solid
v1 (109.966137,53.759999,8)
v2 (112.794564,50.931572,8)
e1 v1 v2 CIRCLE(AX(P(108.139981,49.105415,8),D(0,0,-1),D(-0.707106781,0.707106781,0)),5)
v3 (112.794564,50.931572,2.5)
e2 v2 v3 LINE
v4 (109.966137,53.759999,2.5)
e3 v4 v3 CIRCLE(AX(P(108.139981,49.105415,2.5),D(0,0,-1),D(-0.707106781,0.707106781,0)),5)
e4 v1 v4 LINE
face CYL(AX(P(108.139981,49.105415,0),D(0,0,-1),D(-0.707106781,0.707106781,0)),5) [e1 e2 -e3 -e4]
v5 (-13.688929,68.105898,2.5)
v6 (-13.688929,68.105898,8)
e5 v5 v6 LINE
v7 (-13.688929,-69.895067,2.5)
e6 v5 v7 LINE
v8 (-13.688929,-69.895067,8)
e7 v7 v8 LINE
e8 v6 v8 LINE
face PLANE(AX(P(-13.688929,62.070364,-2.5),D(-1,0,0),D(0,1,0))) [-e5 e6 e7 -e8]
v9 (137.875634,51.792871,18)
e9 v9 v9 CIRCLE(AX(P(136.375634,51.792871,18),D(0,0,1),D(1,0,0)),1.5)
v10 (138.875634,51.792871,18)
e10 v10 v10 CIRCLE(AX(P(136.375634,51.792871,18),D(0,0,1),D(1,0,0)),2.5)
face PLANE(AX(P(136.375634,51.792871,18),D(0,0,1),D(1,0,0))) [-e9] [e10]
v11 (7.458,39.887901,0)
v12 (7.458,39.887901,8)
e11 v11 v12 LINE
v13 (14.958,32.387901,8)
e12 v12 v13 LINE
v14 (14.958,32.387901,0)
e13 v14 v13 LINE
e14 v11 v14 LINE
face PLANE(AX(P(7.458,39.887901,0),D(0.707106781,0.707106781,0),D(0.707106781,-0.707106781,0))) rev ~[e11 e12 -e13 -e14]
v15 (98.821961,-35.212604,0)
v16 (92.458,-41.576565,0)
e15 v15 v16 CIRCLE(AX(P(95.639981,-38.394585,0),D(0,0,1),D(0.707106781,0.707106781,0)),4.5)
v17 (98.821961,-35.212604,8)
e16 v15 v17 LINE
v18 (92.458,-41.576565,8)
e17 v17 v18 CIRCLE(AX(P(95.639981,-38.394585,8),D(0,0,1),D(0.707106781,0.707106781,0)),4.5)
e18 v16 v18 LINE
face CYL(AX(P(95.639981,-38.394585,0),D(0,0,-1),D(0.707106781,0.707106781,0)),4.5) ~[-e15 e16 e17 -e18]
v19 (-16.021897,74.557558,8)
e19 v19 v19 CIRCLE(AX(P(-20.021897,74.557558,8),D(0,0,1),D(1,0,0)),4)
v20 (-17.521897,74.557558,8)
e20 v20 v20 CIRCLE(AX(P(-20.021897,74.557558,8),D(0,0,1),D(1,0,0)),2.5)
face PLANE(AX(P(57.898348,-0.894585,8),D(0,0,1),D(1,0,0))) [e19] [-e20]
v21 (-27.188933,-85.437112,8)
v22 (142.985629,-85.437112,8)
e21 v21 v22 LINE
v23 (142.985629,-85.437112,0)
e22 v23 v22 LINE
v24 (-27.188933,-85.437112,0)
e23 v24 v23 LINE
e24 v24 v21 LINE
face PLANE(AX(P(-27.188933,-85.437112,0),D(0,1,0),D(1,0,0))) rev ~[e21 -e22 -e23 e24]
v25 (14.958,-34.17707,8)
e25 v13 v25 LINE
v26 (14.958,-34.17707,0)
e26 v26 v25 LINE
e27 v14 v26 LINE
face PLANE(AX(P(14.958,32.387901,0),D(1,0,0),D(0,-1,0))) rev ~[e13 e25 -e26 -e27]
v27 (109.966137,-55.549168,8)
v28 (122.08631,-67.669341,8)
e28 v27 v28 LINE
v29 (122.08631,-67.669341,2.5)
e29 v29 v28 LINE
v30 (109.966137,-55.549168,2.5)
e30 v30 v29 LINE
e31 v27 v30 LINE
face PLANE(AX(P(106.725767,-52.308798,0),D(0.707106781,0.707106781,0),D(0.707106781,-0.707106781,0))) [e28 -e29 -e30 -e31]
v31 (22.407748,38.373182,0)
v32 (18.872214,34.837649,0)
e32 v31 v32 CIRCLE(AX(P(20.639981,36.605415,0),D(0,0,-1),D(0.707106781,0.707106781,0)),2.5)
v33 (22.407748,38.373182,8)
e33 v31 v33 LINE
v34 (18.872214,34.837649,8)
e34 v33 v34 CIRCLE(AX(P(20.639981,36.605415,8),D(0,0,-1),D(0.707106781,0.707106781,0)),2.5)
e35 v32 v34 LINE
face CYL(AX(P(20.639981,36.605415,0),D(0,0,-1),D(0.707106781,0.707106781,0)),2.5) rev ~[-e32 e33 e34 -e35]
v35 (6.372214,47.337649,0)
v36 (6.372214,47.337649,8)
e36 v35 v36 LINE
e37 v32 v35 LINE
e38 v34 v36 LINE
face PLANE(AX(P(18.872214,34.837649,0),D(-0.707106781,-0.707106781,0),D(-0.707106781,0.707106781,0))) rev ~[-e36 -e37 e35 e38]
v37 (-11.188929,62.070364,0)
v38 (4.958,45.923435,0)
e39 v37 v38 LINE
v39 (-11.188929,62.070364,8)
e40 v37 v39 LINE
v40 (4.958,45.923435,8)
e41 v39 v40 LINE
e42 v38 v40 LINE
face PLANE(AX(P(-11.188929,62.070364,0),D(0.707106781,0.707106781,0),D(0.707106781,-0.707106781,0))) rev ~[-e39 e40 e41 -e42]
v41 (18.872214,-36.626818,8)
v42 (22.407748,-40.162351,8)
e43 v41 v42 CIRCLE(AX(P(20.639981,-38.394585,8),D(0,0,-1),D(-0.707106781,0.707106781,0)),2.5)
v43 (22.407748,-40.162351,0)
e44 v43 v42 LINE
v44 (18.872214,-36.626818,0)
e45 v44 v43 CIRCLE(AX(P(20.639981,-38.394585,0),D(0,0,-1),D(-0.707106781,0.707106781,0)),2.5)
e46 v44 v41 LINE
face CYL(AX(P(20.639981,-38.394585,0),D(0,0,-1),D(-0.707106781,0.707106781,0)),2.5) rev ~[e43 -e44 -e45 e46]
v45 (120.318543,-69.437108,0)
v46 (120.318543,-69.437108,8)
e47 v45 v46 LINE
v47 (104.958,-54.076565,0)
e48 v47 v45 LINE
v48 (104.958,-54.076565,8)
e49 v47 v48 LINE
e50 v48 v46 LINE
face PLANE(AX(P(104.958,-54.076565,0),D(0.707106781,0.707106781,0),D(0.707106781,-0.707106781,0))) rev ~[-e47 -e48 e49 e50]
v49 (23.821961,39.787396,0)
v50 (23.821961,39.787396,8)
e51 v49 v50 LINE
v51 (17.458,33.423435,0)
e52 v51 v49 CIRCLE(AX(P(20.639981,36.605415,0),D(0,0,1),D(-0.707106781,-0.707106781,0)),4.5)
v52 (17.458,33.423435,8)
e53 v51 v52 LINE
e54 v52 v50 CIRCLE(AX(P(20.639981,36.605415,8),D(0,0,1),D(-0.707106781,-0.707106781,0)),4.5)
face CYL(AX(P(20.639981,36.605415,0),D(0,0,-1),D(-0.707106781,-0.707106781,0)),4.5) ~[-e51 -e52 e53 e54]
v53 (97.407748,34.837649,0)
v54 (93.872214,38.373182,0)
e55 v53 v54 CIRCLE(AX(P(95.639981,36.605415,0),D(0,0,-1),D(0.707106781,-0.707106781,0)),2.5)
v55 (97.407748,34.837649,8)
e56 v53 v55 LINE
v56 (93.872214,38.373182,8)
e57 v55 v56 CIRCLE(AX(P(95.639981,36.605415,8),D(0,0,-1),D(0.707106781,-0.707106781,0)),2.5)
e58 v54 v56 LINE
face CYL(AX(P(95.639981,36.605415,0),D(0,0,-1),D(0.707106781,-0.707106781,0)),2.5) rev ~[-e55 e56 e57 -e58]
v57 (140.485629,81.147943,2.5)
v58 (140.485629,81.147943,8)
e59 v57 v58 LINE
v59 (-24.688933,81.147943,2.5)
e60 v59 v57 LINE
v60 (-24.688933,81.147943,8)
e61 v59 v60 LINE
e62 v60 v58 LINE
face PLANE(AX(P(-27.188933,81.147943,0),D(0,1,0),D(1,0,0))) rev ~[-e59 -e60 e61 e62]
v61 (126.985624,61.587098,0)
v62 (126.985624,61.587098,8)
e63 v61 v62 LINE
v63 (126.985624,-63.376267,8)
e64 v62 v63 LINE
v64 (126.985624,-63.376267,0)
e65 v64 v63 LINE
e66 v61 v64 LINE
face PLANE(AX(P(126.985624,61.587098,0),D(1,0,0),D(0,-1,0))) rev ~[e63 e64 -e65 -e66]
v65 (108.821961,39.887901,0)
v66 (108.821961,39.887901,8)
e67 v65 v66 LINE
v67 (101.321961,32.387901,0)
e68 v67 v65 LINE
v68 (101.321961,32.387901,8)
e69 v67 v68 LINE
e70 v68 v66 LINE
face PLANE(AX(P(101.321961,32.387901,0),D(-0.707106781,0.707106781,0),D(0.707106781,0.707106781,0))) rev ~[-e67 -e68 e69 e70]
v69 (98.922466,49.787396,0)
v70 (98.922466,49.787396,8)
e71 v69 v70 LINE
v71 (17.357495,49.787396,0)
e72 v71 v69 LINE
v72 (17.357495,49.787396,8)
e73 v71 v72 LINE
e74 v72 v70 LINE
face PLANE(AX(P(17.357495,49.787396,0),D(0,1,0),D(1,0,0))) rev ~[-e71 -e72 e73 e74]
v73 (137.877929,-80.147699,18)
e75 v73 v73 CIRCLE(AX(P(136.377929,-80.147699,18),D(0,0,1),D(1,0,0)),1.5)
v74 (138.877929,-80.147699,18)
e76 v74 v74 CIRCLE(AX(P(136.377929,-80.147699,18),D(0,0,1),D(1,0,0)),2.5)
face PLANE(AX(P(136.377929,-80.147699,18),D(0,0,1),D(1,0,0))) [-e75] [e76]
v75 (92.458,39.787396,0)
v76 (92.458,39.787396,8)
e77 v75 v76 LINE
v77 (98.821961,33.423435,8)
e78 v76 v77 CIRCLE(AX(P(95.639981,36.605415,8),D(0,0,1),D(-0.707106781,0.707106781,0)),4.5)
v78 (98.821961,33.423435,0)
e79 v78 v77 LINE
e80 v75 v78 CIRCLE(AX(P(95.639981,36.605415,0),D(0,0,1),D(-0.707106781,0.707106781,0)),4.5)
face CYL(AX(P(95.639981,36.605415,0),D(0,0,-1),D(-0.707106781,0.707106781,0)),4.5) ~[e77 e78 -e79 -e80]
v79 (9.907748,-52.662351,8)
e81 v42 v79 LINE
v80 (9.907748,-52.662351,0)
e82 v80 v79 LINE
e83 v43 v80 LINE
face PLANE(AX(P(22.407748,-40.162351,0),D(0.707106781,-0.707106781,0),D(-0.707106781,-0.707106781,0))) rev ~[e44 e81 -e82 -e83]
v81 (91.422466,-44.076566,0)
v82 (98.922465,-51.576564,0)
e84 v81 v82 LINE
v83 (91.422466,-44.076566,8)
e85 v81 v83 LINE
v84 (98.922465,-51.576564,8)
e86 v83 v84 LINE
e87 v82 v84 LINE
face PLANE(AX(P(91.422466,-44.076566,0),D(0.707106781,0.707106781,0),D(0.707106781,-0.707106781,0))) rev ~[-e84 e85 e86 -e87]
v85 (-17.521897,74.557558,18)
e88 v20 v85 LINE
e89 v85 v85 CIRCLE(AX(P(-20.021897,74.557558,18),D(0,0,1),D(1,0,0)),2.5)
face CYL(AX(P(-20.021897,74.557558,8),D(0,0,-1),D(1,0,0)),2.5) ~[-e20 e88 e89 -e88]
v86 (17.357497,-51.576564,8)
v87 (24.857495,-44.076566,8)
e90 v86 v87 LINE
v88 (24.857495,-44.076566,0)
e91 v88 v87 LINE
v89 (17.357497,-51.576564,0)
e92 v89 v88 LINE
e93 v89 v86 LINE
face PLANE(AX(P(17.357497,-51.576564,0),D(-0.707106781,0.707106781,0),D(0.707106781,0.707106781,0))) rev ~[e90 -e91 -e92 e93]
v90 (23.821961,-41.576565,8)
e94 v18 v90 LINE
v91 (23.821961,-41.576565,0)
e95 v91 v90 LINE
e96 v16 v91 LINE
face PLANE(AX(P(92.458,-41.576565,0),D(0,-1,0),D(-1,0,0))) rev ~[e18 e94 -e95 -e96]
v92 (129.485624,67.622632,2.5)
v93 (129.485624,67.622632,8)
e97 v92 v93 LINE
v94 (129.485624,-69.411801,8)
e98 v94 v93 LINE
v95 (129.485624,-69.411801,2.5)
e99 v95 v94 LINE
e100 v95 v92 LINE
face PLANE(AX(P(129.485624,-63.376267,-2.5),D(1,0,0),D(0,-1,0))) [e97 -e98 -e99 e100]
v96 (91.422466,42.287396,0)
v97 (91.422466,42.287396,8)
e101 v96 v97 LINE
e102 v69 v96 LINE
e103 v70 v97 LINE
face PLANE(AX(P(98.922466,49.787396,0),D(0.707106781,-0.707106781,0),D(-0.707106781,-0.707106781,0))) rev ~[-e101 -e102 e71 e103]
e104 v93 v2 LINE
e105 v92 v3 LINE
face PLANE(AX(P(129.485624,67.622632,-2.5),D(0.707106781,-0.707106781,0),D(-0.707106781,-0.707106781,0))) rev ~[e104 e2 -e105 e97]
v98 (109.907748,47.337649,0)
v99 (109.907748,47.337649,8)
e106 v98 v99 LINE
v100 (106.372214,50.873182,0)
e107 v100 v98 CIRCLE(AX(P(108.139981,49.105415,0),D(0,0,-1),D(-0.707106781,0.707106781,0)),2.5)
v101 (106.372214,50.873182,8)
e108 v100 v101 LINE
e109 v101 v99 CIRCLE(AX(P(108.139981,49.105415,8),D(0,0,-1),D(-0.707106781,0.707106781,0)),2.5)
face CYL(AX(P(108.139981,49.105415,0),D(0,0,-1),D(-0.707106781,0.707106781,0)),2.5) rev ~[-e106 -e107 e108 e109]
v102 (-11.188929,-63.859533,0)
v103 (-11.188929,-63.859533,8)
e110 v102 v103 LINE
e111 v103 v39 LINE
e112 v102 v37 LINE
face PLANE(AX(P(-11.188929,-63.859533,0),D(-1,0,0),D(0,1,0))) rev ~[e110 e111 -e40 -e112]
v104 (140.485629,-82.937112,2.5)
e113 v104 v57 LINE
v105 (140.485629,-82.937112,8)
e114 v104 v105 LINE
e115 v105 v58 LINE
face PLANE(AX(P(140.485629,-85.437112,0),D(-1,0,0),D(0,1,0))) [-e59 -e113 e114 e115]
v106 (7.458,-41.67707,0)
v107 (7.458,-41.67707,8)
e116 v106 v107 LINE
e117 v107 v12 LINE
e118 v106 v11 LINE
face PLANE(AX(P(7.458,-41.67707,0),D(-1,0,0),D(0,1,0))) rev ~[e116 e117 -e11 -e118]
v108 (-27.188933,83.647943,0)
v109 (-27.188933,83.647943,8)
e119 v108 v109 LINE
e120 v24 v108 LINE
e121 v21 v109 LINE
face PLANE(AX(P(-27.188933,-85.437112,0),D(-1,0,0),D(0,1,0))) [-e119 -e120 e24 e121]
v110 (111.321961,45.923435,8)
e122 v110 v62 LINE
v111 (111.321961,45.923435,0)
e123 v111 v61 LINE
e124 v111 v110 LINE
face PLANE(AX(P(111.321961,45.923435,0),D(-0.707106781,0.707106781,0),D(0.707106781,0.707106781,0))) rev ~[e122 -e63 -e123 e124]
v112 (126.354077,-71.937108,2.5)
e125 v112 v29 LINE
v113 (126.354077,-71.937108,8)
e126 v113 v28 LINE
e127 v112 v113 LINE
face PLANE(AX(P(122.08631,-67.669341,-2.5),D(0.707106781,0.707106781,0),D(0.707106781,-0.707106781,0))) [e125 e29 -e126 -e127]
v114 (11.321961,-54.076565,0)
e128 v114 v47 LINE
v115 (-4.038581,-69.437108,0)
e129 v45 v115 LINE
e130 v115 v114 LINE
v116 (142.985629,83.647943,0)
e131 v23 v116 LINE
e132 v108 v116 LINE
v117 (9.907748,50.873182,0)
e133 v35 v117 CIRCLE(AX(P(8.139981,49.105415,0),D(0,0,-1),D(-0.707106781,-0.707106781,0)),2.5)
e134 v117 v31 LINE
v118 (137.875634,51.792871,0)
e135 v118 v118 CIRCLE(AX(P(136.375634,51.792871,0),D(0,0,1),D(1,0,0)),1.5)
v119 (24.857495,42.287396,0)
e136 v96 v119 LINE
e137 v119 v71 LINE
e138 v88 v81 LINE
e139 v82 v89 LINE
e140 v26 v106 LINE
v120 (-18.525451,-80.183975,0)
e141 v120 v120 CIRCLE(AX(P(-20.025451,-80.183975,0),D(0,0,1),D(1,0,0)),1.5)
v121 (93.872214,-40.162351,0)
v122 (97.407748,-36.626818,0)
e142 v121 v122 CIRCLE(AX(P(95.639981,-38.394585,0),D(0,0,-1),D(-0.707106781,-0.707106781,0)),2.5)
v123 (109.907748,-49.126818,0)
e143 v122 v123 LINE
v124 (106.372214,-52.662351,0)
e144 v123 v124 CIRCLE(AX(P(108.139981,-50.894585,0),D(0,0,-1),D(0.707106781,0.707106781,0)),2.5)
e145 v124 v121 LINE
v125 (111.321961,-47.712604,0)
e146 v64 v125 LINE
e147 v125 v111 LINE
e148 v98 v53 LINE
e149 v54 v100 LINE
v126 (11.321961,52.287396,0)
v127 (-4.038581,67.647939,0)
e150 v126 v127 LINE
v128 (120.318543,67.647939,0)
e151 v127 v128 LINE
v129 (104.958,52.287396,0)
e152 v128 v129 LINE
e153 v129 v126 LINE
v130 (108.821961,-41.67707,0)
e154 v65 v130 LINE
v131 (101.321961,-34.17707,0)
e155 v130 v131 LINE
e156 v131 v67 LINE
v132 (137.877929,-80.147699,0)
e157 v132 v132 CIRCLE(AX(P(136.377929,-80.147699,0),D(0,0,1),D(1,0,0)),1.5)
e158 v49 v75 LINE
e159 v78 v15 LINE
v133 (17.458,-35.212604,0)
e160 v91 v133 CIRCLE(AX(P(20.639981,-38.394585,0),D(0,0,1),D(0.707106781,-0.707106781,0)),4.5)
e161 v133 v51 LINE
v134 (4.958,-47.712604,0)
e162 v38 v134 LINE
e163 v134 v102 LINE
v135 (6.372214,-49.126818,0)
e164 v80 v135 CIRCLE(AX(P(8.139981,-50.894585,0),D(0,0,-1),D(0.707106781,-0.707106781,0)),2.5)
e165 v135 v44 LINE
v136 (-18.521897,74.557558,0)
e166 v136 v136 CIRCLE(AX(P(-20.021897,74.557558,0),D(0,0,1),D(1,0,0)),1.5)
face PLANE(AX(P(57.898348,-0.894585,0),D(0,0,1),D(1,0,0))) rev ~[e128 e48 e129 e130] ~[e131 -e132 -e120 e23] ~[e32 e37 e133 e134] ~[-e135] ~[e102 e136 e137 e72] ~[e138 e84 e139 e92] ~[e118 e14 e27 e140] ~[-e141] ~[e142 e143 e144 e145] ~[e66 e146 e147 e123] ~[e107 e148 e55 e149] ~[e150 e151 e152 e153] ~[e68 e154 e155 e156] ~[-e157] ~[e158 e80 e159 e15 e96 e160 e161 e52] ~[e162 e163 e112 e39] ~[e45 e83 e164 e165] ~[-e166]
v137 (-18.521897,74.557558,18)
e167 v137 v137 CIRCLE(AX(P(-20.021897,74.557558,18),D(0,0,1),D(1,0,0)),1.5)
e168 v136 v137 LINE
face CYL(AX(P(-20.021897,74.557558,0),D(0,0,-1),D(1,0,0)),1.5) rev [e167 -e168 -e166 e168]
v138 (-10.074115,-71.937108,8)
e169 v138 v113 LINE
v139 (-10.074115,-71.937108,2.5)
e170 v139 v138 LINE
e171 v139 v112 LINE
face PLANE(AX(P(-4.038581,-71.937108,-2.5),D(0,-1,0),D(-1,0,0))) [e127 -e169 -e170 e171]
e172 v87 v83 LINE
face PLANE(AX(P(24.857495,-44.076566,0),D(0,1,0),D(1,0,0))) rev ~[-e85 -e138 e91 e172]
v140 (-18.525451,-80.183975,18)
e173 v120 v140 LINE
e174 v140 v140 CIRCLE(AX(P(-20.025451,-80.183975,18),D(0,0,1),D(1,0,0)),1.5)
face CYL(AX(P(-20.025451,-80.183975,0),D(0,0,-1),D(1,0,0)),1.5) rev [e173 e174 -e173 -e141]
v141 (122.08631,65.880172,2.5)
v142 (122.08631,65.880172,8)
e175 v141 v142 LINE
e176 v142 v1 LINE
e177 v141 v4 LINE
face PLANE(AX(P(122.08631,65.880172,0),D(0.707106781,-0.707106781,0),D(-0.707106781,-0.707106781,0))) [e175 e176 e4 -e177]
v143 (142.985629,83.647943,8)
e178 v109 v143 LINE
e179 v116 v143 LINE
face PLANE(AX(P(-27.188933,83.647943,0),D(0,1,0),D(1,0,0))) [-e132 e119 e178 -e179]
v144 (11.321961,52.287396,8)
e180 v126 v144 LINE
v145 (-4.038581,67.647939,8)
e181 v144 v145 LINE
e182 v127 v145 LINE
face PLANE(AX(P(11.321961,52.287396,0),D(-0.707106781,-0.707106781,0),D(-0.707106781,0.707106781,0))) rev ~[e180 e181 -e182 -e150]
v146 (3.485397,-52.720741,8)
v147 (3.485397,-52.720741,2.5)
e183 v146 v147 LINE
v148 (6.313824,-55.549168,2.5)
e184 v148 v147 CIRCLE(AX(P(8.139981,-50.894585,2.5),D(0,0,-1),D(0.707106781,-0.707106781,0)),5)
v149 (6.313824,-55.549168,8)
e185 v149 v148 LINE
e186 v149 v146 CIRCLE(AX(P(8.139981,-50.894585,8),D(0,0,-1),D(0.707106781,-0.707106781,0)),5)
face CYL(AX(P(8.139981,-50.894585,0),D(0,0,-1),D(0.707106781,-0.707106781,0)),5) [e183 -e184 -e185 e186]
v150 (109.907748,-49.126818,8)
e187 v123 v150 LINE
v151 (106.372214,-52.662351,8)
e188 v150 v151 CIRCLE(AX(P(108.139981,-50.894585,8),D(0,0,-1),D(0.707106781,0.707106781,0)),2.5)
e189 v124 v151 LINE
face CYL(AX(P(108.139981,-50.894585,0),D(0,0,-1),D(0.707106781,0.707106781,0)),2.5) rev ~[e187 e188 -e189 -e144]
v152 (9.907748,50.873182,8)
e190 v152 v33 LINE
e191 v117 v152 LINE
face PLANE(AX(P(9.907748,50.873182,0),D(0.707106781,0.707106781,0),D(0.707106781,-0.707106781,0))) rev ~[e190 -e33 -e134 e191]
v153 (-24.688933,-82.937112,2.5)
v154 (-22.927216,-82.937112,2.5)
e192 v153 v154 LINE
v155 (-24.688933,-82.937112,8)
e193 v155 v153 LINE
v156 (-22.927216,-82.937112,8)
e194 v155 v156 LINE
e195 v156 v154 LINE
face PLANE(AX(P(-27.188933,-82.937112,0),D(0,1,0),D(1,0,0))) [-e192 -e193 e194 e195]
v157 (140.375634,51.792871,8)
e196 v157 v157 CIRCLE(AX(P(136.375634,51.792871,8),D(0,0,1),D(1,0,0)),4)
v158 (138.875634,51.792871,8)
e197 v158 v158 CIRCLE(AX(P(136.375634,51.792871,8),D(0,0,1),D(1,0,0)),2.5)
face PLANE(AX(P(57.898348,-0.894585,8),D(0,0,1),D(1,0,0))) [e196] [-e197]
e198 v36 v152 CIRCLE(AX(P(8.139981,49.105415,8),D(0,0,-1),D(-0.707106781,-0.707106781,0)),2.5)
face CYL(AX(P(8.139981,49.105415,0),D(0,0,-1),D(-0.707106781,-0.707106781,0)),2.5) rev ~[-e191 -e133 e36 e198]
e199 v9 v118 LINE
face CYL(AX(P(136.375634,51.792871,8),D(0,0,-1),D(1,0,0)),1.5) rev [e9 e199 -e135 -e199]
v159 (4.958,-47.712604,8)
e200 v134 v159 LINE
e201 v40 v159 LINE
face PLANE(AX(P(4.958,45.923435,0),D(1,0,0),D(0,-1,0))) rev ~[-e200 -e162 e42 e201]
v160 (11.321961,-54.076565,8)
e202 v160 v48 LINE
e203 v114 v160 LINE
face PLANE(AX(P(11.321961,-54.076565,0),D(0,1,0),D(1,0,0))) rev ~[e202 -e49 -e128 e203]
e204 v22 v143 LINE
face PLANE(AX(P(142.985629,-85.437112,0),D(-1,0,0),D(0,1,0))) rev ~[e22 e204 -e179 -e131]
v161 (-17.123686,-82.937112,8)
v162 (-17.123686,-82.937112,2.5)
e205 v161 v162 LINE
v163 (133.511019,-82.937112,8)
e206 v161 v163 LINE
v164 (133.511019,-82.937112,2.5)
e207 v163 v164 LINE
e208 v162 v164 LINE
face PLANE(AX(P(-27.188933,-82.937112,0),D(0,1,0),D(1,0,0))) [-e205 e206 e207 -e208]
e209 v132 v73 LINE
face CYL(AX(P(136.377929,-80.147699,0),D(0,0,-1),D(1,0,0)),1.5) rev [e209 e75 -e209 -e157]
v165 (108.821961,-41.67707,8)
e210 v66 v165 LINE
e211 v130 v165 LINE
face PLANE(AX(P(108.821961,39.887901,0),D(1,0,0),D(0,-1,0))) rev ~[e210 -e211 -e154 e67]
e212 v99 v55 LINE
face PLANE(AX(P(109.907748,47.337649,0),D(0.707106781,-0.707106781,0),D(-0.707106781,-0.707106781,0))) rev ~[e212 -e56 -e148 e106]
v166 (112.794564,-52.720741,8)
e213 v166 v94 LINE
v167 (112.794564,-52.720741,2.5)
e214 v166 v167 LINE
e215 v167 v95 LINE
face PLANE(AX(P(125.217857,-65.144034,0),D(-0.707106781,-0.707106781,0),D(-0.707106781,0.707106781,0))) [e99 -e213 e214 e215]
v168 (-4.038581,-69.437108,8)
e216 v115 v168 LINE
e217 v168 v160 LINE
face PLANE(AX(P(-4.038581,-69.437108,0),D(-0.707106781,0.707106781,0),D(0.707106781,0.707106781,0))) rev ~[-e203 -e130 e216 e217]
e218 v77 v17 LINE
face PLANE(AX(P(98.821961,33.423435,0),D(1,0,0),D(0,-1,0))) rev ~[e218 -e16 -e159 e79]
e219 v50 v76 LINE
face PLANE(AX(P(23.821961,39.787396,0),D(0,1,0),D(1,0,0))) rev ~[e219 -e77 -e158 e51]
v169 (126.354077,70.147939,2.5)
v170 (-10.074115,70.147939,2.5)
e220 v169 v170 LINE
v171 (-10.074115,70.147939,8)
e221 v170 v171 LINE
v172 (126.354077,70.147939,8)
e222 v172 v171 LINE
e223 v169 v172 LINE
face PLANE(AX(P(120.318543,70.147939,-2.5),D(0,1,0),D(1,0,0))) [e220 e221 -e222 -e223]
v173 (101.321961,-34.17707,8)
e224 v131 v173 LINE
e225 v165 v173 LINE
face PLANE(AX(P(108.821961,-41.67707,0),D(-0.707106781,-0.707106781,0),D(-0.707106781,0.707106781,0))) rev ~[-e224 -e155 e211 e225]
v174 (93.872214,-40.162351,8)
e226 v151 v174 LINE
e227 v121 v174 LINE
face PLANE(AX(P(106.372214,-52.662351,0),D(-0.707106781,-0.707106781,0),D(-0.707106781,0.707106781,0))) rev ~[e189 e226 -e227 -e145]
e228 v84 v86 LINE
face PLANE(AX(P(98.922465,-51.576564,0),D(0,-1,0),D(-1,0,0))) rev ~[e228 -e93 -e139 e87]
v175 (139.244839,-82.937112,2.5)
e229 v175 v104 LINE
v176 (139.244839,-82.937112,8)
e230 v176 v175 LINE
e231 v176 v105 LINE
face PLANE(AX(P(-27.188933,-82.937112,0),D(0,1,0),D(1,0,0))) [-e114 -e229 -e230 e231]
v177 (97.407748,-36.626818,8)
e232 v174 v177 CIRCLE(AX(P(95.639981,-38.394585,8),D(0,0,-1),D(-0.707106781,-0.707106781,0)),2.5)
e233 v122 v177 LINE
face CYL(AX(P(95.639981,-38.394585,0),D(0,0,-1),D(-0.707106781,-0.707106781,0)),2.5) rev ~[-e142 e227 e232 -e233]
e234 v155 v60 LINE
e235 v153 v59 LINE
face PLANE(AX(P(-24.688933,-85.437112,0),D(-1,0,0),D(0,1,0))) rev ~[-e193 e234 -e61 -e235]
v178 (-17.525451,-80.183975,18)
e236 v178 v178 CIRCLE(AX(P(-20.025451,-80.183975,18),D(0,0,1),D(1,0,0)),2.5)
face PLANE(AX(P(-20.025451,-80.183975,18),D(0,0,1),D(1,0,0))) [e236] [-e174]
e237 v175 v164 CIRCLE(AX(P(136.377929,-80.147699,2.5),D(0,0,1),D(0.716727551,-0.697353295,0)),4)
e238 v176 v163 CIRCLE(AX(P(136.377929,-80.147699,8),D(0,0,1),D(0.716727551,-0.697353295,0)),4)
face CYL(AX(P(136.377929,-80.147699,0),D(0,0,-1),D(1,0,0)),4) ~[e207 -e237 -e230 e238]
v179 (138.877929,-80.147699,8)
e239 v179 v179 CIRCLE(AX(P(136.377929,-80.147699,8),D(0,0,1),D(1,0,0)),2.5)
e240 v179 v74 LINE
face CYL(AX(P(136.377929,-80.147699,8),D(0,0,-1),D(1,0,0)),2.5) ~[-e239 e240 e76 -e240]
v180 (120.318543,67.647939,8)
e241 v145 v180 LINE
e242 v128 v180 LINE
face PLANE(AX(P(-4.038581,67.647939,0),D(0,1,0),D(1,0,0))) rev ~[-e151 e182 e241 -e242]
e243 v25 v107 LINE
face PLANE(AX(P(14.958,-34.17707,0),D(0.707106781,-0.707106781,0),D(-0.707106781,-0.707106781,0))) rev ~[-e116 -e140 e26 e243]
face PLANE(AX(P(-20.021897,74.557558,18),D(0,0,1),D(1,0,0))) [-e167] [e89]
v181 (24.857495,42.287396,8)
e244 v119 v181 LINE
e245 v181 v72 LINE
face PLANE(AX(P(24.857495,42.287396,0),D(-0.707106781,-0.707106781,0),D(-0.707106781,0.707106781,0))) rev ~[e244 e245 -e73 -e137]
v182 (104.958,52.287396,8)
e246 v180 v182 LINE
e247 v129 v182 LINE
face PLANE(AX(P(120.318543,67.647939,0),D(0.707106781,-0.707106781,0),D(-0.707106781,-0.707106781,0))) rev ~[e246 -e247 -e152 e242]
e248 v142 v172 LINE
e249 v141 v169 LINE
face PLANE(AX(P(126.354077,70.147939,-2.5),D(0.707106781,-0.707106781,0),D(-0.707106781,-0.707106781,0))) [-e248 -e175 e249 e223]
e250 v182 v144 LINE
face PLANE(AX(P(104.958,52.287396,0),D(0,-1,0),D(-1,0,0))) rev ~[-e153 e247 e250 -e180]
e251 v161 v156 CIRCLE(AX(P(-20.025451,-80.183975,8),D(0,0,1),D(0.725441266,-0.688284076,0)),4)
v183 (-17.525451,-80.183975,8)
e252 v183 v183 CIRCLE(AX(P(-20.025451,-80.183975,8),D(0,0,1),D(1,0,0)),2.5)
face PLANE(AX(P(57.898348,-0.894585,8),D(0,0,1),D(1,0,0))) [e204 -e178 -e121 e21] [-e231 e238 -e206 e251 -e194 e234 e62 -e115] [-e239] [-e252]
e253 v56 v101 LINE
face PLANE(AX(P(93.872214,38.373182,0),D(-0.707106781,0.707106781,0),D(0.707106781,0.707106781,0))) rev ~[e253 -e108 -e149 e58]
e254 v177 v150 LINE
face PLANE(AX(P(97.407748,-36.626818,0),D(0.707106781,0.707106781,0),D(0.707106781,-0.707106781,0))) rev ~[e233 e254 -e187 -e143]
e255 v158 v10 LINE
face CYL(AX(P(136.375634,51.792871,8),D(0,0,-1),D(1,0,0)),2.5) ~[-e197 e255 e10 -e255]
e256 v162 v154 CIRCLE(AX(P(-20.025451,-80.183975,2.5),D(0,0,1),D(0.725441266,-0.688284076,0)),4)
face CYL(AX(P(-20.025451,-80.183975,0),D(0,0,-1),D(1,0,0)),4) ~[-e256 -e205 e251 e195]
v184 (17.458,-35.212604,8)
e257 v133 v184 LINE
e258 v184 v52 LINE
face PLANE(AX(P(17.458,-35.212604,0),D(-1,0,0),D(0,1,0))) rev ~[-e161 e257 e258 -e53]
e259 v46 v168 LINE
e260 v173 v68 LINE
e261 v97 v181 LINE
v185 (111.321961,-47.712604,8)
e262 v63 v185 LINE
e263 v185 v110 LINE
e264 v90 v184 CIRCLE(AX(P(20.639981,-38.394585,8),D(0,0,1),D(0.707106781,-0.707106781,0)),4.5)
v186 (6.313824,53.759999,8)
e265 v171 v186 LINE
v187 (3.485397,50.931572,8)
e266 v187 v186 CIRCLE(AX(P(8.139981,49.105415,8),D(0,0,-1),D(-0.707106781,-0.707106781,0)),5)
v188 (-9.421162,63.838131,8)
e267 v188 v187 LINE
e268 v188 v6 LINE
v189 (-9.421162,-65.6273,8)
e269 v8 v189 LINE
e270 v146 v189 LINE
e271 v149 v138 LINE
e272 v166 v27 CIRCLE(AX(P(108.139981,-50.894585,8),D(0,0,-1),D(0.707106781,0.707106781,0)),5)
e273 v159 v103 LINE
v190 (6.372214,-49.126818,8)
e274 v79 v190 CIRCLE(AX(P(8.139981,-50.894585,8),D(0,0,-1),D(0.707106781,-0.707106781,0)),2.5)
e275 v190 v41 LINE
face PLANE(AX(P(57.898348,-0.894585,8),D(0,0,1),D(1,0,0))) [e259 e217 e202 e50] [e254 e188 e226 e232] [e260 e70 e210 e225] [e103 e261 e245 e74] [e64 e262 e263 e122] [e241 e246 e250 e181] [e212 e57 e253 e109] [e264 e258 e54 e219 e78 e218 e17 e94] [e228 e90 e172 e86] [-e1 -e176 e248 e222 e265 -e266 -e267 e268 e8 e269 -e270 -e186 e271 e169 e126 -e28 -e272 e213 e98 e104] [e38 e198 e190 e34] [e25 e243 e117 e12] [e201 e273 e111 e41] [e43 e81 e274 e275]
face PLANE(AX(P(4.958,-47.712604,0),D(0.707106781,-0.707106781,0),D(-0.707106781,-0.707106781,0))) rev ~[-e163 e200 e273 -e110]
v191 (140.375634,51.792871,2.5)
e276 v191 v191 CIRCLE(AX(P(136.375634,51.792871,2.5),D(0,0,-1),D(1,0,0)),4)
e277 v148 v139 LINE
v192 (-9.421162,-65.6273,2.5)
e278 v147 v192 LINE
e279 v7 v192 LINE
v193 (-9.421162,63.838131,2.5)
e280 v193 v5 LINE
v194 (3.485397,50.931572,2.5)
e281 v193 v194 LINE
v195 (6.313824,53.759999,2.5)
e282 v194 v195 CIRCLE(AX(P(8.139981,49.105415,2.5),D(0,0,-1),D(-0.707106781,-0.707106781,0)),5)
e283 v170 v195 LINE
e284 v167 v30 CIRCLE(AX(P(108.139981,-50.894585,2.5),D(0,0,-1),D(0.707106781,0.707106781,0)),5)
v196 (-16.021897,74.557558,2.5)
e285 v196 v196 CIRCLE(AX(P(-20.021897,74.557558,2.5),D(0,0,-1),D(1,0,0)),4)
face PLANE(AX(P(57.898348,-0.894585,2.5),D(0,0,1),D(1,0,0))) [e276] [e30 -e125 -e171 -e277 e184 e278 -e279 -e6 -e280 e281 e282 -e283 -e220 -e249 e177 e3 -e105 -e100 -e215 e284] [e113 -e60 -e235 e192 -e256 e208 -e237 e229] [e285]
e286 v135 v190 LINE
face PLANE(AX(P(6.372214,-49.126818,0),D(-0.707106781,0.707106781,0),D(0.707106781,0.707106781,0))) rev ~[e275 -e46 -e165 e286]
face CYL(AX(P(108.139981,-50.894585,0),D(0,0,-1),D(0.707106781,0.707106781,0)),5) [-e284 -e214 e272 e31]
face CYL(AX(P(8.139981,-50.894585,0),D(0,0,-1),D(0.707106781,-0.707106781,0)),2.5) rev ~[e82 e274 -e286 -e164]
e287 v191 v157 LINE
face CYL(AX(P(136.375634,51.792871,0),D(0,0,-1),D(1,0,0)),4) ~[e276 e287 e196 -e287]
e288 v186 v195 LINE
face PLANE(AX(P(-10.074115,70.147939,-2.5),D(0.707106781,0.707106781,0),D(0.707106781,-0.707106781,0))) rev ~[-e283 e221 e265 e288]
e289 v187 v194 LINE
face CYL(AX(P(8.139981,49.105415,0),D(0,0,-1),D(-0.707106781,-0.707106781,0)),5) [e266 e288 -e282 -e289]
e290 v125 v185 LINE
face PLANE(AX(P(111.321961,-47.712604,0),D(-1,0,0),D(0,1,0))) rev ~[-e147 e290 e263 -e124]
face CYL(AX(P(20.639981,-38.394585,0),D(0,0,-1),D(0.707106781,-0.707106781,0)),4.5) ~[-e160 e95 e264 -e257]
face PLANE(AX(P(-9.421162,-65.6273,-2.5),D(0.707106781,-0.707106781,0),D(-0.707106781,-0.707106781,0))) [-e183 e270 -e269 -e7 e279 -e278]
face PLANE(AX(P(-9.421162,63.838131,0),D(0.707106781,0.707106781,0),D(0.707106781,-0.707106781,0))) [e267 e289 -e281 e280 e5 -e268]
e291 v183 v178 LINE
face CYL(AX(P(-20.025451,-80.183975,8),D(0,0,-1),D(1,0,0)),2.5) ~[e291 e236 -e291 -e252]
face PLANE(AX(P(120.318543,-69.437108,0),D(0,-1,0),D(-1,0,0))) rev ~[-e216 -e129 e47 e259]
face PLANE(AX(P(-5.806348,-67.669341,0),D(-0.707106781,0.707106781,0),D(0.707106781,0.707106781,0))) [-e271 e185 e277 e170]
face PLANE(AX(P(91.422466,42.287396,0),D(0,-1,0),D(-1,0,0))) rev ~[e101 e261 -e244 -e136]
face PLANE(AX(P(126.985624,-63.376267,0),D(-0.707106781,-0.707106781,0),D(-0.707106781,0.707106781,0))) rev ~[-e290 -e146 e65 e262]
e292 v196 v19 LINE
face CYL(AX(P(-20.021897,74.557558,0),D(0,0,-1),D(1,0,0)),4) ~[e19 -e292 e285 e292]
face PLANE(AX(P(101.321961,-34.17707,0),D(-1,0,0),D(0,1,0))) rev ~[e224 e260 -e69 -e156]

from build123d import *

# Parameters (mm, degrees)
F0_W        = 170.1745619284
F0_H        = 169.0850543895
F0_R        = 2.5
F0_R_2      = 1.5
F1_DEPTH    = 8
F2_T        = 2.5
F2_T3_DEPTH = 13
F3_R        = 2.5
F3_R_2      = 1.5
F4_DEPTH    = 10


# Not quite as in the source:
# - a shell that OpenCascade refuses in one call is made with other operations: the cavity is built on its own and cut out


with BuildPart() as f1:
    # F0 (on Top) → F1 (new body)
    with BuildSketch(Plane.XY):
        with Locations((57.8983475621, -0.8945845068)):
            Rectangle(F0_W, F0_H)
        with Locations((-20.0254507363, -80.1839753985)):
            Circle(F0_R, mode=Mode.SUBTRACT)
        with Locations((136.3779287785, -80.1476985216)):
            Circle(F0_R, mode=Mode.SUBTRACT)
        with Locations((-20.0218968093, 74.5575577021)):
            Circle(F0_R, mode=Mode.SUBTRACT)
        Polygon((-11.1889293083, 67.6479385942), (-4.0385814859, 67.6479385942), (120.3185426547, 67.6479385942), (126.9856244326, 67.6479385942), (126.9856244326, 61.5870983108), (126.9856244326, -63.3762673243), (126.9856244326, -69.4371076077), (120.3185426547, -69.4371076077), (-4.0385814859, -69.4371076077), (-11.1889293083, -69.4371076077), (-11.1889293083, -63.8595333687), (-11.1889293083, 62.0703643552), align=None, mode=Mode.SUBTRACT)
        with Locations((136.3756339997, 51.792871207)):
            Circle(F0_R, mode=Mode.SUBTRACT)
        with BuildLine():
            Line((23.8219610997, 39.7873960086), (11.3219610997, 52.2873960086))
            ThreePointArc((11.3219610997, 52.2873960086), (4.958000069, 52.2873960086), (4.958000069, 45.9234349779))
            Line((4.958000069, 45.9234349779), (17.458000069, 33.4234349779))
            ThreePointArc((17.458000069, 33.4234349779), (23.8219610997, 33.4234349779), (23.8219610997, 39.7873960086))
        make_face()
        with BuildLine():
            ThreePointArc((22.4077475373, 38.3731824462), (22.4077475373, 34.8376485403), (18.8722136314, 34.8376485403))
            Line((18.8722136314, 34.8376485403), (6.3722136314, 47.3376485403))
            ThreePointArc((6.3722136314, 47.3376485403), (6.3722136314, 50.8731824462), (9.9077475373, 50.8731824462))
            Line((9.9077475373, 50.8731824462), (22.4077475373, 38.3731824462))
        make_face(mode=Mode.SUBTRACT)
        with BuildLine():
            ThreePointArc((111.3219610997, 45.9234349779), (111.3219610997, 52.2873960086), (104.958000069, 52.2873960086))
            Line((104.958000069, 52.2873960086), (92.458000069, 39.7873960086))
            ThreePointArc((92.458000069, 39.7873960086), (92.458000069, 33.4234349779), (98.8219610997, 33.4234349779))
            Line((98.8219610997, 33.4234349779), (111.3219610997, 45.9234349779))
        make_face()
        with BuildLine():
            Line((109.9077475373, 47.3376485403), (97.4077475373, 34.8376485403))
            ThreePointArc((97.4077475373, 34.8376485403), (93.8722136314, 34.8376485403), (93.8722136314, 38.3731824462))
            Line((93.8722136314, 38.3731824462), (106.3722136314, 50.8731824462))
            ThreePointArc((106.3722136314, 50.8731824462), (109.9077475373, 50.8731824462), (109.9077475373, 47.3376485403))
        make_face(mode=Mode.SUBTRACT)
        with BuildLine():
            ThreePointArc((104.958000069, -54.0765650221), (111.3219610997, -54.0765650221), (111.3219610997, -47.7126039914))
            Line((111.3219610997, -47.7126039914), (98.8219610997, -35.2126039914))
            ThreePointArc((98.8219610997, -35.2126039914), (92.458000069, -35.2126039914), (92.458000069, -41.5765650221))
            Line((92.458000069, -41.5765650221), (104.958000069, -54.0765650221))
        make_face()
        with BuildLine():
            ThreePointArc((93.8722136314, -40.1623514597), (93.8722136314, -36.6268175538), (97.4077475373, -36.6268175538))
            Line((97.4077475373, -36.6268175538), (109.9077475373, -49.1268175538))
            ThreePointArc((109.9077475373, -49.1268175538), (109.9077475373, -52.6623514597), (106.3722136314, -52.6623514597))
            Line((106.3722136314, -52.6623514597), (93.8722136314, -40.1623514597))
        make_face(mode=Mode.SUBTRACT)
        with BuildLine():
            Line((17.458000069, -35.2126039914), (4.958000069, -47.7126039914))
            ThreePointArc((4.958000069, -47.7126039914), (4.958000069, -54.0765650221), (11.3219610997, -54.0765650221))
            Line((11.3219610997, -54.0765650221), (23.8219610997, -41.5765650221))
            ThreePointArc((23.8219610997, -41.5765650221), (23.8219610997, -35.2126039914), (17.458000069, -35.2126039914))
        make_face()
        with BuildLine():
            Line((6.3722136314, -49.1268175538), (18.8722136314, -36.6268175538))
            ThreePointArc((18.8722136314, -36.6268175538), (22.4077475373, -36.6268175538), (22.4077475373, -40.1623514597))
            Line((22.4077475373, -40.1623514597), (9.9077475373, -52.6623514597))
            ThreePointArc((9.9077475373, -52.6623514597), (6.3722136314, -52.6623514597), (6.3722136314, -49.1268175538))
        make_face(mode=Mode.SUBTRACT)
        with Locations((-20.0218968093, 74.5575577021)):
            Circle(F0_R)
        with Locations((-20.0218968093, 74.5575577021)):
            Circle(F0_R_2, mode=Mode.SUBTRACT)
        with Locations((136.3756339997, 51.792871207)):
            Circle(F0_R)
        with Locations((136.3756339997, 51.792871207)):
            Circle(F0_R_2, mode=Mode.SUBTRACT)
        with Locations((136.3779287785, -80.1476985216)):
            Circle(F0_R)
        with Locations((136.3779287785, -80.1476985216)):
            Circle(F0_R_2, mode=Mode.SUBTRACT)
        with Locations((-20.0254507363, -80.1839753985)):
            Circle(F0_R)
        with Locations((-20.0254507363, -80.1839753985)):
            Circle(F0_R_2, mode=Mode.SUBTRACT)
        with BuildLine():
            Line((126.9856244326, -63.3762673243), (111.3219610997, -47.7126039914))
            ThreePointArc((111.3219610997, -47.7126039914), (111.3219610997, -54.0765650221), (104.958000069, -54.0765650221))
            Line((104.958000069, -54.0765650221), (120.3185426547, -69.4371076077))
            Line((120.3185426547, -69.4371076077), (126.9856244326, -69.4371076077))
            Line((126.9856244326, -69.4371076077), (126.9856244326, -63.3762673243))
        make_face()
        with BuildLine():
            ThreePointArc((11.3219610997, -54.0765650221), (4.958000069, -54.0765650221), (4.958000069, -47.7126039914))
            Line((4.958000069, -47.7126039914), (-11.1889293083, -63.8595333687))
            Line((-11.1889293083, -63.8595333687), (-11.1889293083, -69.4371076077))
            Line((-11.1889293083, -69.4371076077), (-4.0385814859, -69.4371076077))
            Line((-4.0385814859, -69.4371076077), (11.3219610997, -54.0765650221))
        make_face()
        Polygon((23.8219610997, -41.5765650221), (11.3219610997, -54.0765650221), (104.958000069, -54.0765650221), (92.458000069, -41.5765650221), align=None)
        Polygon((24.857495267, -44.0765656531), (91.4224659017, -44.0765656531), (98.9224646398, -51.5765643911), (17.357496529, -51.5765643911), align=None, mode=Mode.SUBTRACT)
        Polygon((111.3219610997, -47.7126039914), (111.3219610997, 45.9234349779), (98.8219610997, 33.4234349779), (98.8219610997, -35.2126039914), align=None)
        Polygon((101.3219610997, -34.1770700855), (101.3219610997, 32.387901072), (108.8219610997, 39.887901072), (108.8219610997, -41.6770700855), align=None, mode=Mode.SUBTRACT)
        Polygon((17.458000069, 33.4234349779), (4.958000069, 45.9234349779), (4.958000069, -47.7126039914), (17.458000069, -35.2126039914), align=None)
        Polygon((14.958000069, 32.387901072), (14.958000069, -34.1770700855), (7.458000069, -41.6770700855), (7.458000069, 39.887901072), align=None, mode=Mode.SUBTRACT)
        Polygon((104.958000069, 52.2873960086), (11.3219610997, 52.2873960086), (23.8219610997, 39.7873960086), (92.458000069, 39.7873960086), align=None)
        Polygon((91.4224661631, 42.2873960086), (24.8574950057, 42.2873960086), (17.3574950057, 49.7873960086), (98.9224661631, 49.7873960086), align=None, mode=Mode.SUBTRACT)
        with BuildLine():
            Line((120.3185426547, 67.6479385942), (104.958000069, 52.2873960086))
            ThreePointArc((104.958000069, 52.2873960086), (111.3219610997, 52.2873960086), (111.3219610997, 45.9234349779))
            Line((111.3219610997, 45.9234349779), (126.9856244326, 61.5870983108))
            Line((126.9856244326, 61.5870983108), (126.9856244326, 67.6479385942))
            Line((126.9856244326, 67.6479385942), (120.3185426547, 67.6479385942))
        make_face()
        with BuildLine():
            ThreePointArc((4.958000069, 45.9234349779), (4.958000069, 52.2873960086), (11.3219610997, 52.2873960086))
            Line((11.3219610997, 52.2873960086), (-4.0385814859, 67.6479385942))
            Line((-4.0385814859, 67.6479385942), (-11.1889293083, 67.6479385942))
            Line((-11.1889293083, 67.6479385942), (-11.1889293083, 62.0703643552))
            Line((-11.1889293083, 62.0703643552), (4.958000069, 45.9234349779))
        make_face()
    extrude(amount=F1_DEPTH)

    # F2: shell of thickness 2.5, made by hand


with BuildPart() as f2_core1:
    # F2_t2: copy of F1
    add(f1.part)

    # the walls: a layer under each face that stays
    f2_faces = [f2_core1.faces().sort_by_distance(p)[0] for p in [
        (57.8983475621, 83.647942688, 4),
        (-27.1889334021, -0.8945845068, 4),
        (57.8983475621, -85.4371117015, 4),
        (142.9856285263, -0.8945845068, 4),
        (58.1399805844, 67.6479385942, 4),
        (112.6382713619, 59.9676673014, 4),
        (58.1399805844, 52.2873960086, 4),
        (3.6416898069, 59.9676673014, 4),
        (4.958000069, -0.8945845068, 4),
        (-3.1154646196, -55.7860686801, 4),
        (-11.1889293083, -0.8945845067, 4),
        (-3.1154646196, 53.9968996666, 4),
        (126.9856244326, -0.8945845068, 4),
        (119.1537927661, -55.5444356578, 4),
        (111.3219610997, -0.8945845068, 4),
        (119.1537927661, 53.7552666443, 4),
        (92.458000069, 33.4234349779, 4),
        (98.8219610997, -0.8945845068, 4),
        (92.458000069, -35.2126039914, 4),
        (58.1399805844, -41.5765650221, 4),
        (23.8219610997, -35.2126039914, 4),
        (17.458000069, -0.8945845068, 4),
        (23.8219610997, 33.4234349779, 4),
        (58.1399805844, 39.7873960086, 4),
        (112.6382713619, -61.7568363149, 4),
        (58.1399805844, -69.4371076077, 4),
        (3.6416898069, -61.7568363149, 4),
        (58.1399805844, -54.0765650221, 4),
        (-21.5218968093, 74.5575577021, 4),
        (134.8756339997, 51.792871207, 4),
        (134.8779287785, -80.1476985216, 4),
        (-21.5254507363, -80.1839753985, 4),
        (103.6577475373, -42.8768175538, 4),
        (109.9077475373, -52.6623514597, 4),
        (100.1222136314, -46.4123514597, 4),
        (93.8722136314, -36.6268175538, 4),
        (16.1577475373, -46.4123514597, 4),
        (6.3722136314, -52.6623514597, 4),
        (12.6222136314, -42.8768175538, 4),
        (22.4077475373, -36.6268175538, 4),
        (58.1399805844, -51.5765643911, 4),
        (21.107495898, -47.8265650221, 4),
        (58.1399805844, -44.0765656531, 4),
        (95.1724652707, -47.8265650221, 4),
        (108.8219610997, -0.8945845068, 4),
        (105.0719610997, -37.9270700855, 4),
        (101.3219610997, -0.8945845068, 4),
        (105.0719610997, 36.137901072, 4),
        (109.9077475373, 50.8731824462, 4),
        (103.6577475373, 41.0876485403, 4),
        (93.8722136314, 34.8376485403, 4),
        (100.1222136314, 44.6231824462, 4),
        (7.458000069, -0.8945845068, 4),
        (11.208000069, 36.137901072, 4),
        (14.958000069, -0.8945845068, 4),
        (11.208000069, -37.9270700855, 4),
        (6.3722136314, 50.8731824462, 4),
        (16.1577475373, 44.6231824462, 4),
        (22.4077475373, 34.8376485403, 4),
        (12.6222136314, 41.0876485403, 4),
        (58.1399805844, 42.2873960086, 4),
        (21.1074950057, 46.0373960086, 4),
        (58.1399805844, 49.7873960086, 4),
        (95.1724661631, 46.0373960086, 4),
        (1.173493586, -57.2562693032, 0),
    ]]
    thicken(f2_faces, amount=-F2_T, mode=Mode.SUBTRACT)

    # F2_s4 → F2_t3 (cut)
    with BuildSketch(Plane.XY.offset(-2.5)):
        Polygon((-4.0209038164, 67.6406162638), (-4.0385814859, 70.1479385942), (-10.0741153918, 70.1479385942), (-5.8063484389, 65.8801716413), align=None)
        Polygon((120.3008649852, 67.6406162638), (120.3185426547, 70.1479385942), (126.3540765606, 70.1479385942), (122.0863096076, 65.8801716413), align=None)
        Polygon((104.9403223995, 52.3300736781), (106.725767022, 50.5196290556), (105.993533975, 49.7873960086), (104.958000069, 49.7873960086), align=None)
        Polygon((11.3396387693, 52.3300736781), (11.3219610997, 49.7873960086), (10.2864271938, 49.7873960086), (9.5541941468, 50.5196290556), align=None)
        Polygon((4.9153223995, 45.9057573084), (7.458000069, 45.9234349779), (7.458000069, 46.9589688838), (6.725767022, 47.6912019309), align=None)
        Polygon((4.9153223995, -47.6949263219), (7.458000069, -47.7126039914), (7.458000069, -48.7481378973), (6.725767022, -49.4803709444), align=None)
        Polygon((-11.1816069778, -63.8418556992), (-9.4211623553, -65.6273003217), (-13.6889293083, -69.8950672747), (-13.6889293083, -63.8595333687), align=None)
        Polygon((-11.1816069778, 62.0526866857), (-13.6889293083, 62.0703643552), (-13.6889293083, 68.1058982612), (-9.4211623553, 63.8381313082), align=None)
        Polygon((126.9783021021, 61.5694206412), (129.4856244326, 61.5870983108), (129.4856244326, 67.6226322167), (125.2178574796, 63.3548652637), align=None)
        Polygon((126.9783021021, -63.3585896547), (129.4856244326, -63.3762673243), (129.4856244326, -69.4118012302), (125.2178574796, -65.1440342772), align=None)
        Polygon((111.3646387693, -47.6949263219), (109.5541941468, -49.4803709444), (108.8219610997, -48.7481378973), (108.8219610997, -47.7126039914), align=None)
        Polygon((111.3646387693, 45.9057573084), (108.8219610997, 45.9234349779), (108.8219610997, 46.9589688838), (109.5541941468, 47.6912019309), align=None)
        Polygon((92.4403223995, 39.7800736781), (94.225767022, 38.0196290556), (98.493533975, 42.2873960086), (92.458000069, 42.2873960086), align=None)
        Polygon((98.8146387693, 33.4057573084), (97.0541941468, 35.1912019309), (101.3219610997, 39.4589688838), (101.3219610997, 33.4234349779), align=None)
        Polygon((98.8146387693, -35.1949263219), (101.3219610997, -35.2126039914), (101.3219610997, -41.2481378973), (97.0541941468, -36.9803709444), align=None)
        Polygon((92.4403223995, -41.5692426916), (94.225767022, -39.8087980691), (98.493533975, -44.0765650221), (92.458000069, -44.0765650221), align=None)
        Polygon((23.8396387693, -41.5692426916), (23.8219610997, -44.0765650221), (17.7864271938, -44.0765650221), (22.0541941468, -39.8087980691), align=None)
        Polygon((17.4653223995, -35.1949263219), (19.225767022, -36.9803709444), (14.958000069, -41.2481378973), (14.958000069, -35.2126039914), align=None)
        Polygon((17.4653223995, 33.4057573084), (14.958000069, 33.4234349779), (14.958000069, 39.4589688838), (19.225767022, 35.1912019309), align=None)
        Polygon((23.8396387693, 39.7800736781), (22.0541941468, 38.0196290556), (17.7864271938, 42.2873960086), (23.8219610997, 42.2873960086), align=None)
        Polygon((104.9403223995, -54.1192426916), (106.725767022, -52.3087980691), (105.993533975, -51.5765650221), (104.958000069, -51.5765650221), align=None)
        Polygon((120.3008649852, -69.4297852773), (122.0863096076, -67.6693406548), (126.3540765606, -71.9371076077), (120.3185426547, -71.9371076077), align=None)
        Polygon((-4.0209038164, -69.4297852773), (-4.0385814859, -71.9371076077), (-10.0741153918, -71.9371076077), (-5.8063484389, -67.6693406548), align=None)
        Polygon((11.3396387693, -54.1192426916), (9.5541941468, -52.3087980691), (10.2864271938, -51.5765650221), (11.3219610997, -51.5765650221), align=None)
        Polygon((98.9047869702, -51.5692420606), (98.9224646398, -54.0765643911), (104.9579985457, -54.0765643911), (100.6902315927, -49.8087974381), align=None)
        Polygon((17.3751741985, -51.5692420606), (17.357496529, -54.0765643911), (11.3219626231, -54.0765643911), (15.589729576, -49.8087974381), align=None)
        Polygon((24.8751729366, -44.1192433226), (23.0897283141, -42.3087987001), (23.8219613611, -41.5765656531), (24.857495267, -41.5765656531), align=None)
        Polygon((91.4047882322, -44.1192433226), (91.4224659017, -41.5765656531), (92.4579998077, -41.5765656531), (93.1902328547, -42.3087987001), align=None)
        Polygon((108.8146387693, 39.8702234024), (111.3219610997, 39.887901072), (111.3219610997, 45.9234349779), (107.0541941468, 41.6556680249), align=None)
        Polygon((108.8146387693, -41.6593924159), (111.3219610997, -41.6770700855), (111.3219610997, -47.7126039914), (107.0541941468, -43.4448370384), align=None)
        Polygon((101.3646387693, -34.1593924159), (99.5541941468, -35.9448370384), (98.8219610997, -35.2126039914), (98.8219610997, -34.1770700855), align=None)
        Polygon((101.3646387693, 32.3702234024), (98.8219610997, 32.387901072), (98.8219610997, 33.4234349779), (99.5541941468, 34.1556680249), align=None)
        Polygon((7.4653223995, -41.6593924159), (4.958000069, -41.6770700855), (4.958000069, -47.7126039914), (9.225767022, -43.4448370384), align=None)
        Polygon((7.4653223995, 39.8702234024), (4.958000069, 39.887901072), (4.958000069, 45.9234349779), (9.225767022, 41.6556680249), align=None)
        Polygon((14.9153223995, 32.3702234024), (16.725767022, 34.1556680249), (17.458000069, 33.4234349779), (17.458000069, 32.387901072), align=None)
        Polygon((14.9153223995, -34.1593924159), (17.458000069, -34.1770700855), (17.458000069, -35.2126039914), (16.725767022, -35.9448370384), align=None)
        Polygon((91.4047884936, 42.3300736781), (91.4224661631, 39.7873960086), (92.458000069, 39.7873960086), (93.1902331161, 40.5196290556), align=None)
        Polygon((24.8751726752, 42.3300736781), (24.8574950057, 39.7873960086), (23.8219610997, 39.7873960086), (23.0897280527, 40.5196290556), align=None)
        Polygon((17.3751726752, 49.7800736781), (15.5897280527, 48.0196290556), (11.3219610997, 52.2873960086), (17.3574950057, 52.2873960086), align=None)
        Polygon((98.9047884936, 49.7800736781), (98.9224661631, 52.2873960086), (104.958000069, 52.2873960086), (100.6902331161, 48.0196290556), align=None)
    extrude(amount=F2_T3_DEPTH, mode=Mode.SUBTRACT)


with BuildPart() as f1_1:
    add(f1.part)

    # what is left inside the walls is the cavity
    f2_cavity = [f2_core1.part.solids().sort_by_distance(p)[0] for p in [
        (-14.365523, 62.91627, 2.525),
    ]]
    add(f2_cavity, mode=Mode.SUBTRACT)

    # F3 (on face) → F4 (join)
    with BuildSketch(Plane.XY.offset(8)):
        with Locations((136.3756339997, 51.792871207)):
            Circle(F3_R)
        with Locations((136.3756339997, 51.792871207)):
            Circle(F3_R_2, mode=Mode.SUBTRACT)
        with Locations((-20.0218968093, 74.5575577021)):
            Circle(F3_R)
        with Locations((-20.0218968093, 74.5575577021)):
            Circle(F3_R_2, mode=Mode.SUBTRACT)
        with Locations((-20.0254507363, -80.1839753985)):
            Circle(F3_R)
        with Locations((-20.0254507363, -80.1839753985)):
            Circle(F3_R_2, mode=Mode.SUBTRACT)
        with Locations((136.3779287785, -80.1476985216)):
            Circle(F3_R)
        with Locations((136.3779287785, -80.1476985216)):
            Circle(F3_R_2, mode=Mode.SUBTRACT)
    extrude(amount=F4_DEPTH)


solid = f1_1.part
